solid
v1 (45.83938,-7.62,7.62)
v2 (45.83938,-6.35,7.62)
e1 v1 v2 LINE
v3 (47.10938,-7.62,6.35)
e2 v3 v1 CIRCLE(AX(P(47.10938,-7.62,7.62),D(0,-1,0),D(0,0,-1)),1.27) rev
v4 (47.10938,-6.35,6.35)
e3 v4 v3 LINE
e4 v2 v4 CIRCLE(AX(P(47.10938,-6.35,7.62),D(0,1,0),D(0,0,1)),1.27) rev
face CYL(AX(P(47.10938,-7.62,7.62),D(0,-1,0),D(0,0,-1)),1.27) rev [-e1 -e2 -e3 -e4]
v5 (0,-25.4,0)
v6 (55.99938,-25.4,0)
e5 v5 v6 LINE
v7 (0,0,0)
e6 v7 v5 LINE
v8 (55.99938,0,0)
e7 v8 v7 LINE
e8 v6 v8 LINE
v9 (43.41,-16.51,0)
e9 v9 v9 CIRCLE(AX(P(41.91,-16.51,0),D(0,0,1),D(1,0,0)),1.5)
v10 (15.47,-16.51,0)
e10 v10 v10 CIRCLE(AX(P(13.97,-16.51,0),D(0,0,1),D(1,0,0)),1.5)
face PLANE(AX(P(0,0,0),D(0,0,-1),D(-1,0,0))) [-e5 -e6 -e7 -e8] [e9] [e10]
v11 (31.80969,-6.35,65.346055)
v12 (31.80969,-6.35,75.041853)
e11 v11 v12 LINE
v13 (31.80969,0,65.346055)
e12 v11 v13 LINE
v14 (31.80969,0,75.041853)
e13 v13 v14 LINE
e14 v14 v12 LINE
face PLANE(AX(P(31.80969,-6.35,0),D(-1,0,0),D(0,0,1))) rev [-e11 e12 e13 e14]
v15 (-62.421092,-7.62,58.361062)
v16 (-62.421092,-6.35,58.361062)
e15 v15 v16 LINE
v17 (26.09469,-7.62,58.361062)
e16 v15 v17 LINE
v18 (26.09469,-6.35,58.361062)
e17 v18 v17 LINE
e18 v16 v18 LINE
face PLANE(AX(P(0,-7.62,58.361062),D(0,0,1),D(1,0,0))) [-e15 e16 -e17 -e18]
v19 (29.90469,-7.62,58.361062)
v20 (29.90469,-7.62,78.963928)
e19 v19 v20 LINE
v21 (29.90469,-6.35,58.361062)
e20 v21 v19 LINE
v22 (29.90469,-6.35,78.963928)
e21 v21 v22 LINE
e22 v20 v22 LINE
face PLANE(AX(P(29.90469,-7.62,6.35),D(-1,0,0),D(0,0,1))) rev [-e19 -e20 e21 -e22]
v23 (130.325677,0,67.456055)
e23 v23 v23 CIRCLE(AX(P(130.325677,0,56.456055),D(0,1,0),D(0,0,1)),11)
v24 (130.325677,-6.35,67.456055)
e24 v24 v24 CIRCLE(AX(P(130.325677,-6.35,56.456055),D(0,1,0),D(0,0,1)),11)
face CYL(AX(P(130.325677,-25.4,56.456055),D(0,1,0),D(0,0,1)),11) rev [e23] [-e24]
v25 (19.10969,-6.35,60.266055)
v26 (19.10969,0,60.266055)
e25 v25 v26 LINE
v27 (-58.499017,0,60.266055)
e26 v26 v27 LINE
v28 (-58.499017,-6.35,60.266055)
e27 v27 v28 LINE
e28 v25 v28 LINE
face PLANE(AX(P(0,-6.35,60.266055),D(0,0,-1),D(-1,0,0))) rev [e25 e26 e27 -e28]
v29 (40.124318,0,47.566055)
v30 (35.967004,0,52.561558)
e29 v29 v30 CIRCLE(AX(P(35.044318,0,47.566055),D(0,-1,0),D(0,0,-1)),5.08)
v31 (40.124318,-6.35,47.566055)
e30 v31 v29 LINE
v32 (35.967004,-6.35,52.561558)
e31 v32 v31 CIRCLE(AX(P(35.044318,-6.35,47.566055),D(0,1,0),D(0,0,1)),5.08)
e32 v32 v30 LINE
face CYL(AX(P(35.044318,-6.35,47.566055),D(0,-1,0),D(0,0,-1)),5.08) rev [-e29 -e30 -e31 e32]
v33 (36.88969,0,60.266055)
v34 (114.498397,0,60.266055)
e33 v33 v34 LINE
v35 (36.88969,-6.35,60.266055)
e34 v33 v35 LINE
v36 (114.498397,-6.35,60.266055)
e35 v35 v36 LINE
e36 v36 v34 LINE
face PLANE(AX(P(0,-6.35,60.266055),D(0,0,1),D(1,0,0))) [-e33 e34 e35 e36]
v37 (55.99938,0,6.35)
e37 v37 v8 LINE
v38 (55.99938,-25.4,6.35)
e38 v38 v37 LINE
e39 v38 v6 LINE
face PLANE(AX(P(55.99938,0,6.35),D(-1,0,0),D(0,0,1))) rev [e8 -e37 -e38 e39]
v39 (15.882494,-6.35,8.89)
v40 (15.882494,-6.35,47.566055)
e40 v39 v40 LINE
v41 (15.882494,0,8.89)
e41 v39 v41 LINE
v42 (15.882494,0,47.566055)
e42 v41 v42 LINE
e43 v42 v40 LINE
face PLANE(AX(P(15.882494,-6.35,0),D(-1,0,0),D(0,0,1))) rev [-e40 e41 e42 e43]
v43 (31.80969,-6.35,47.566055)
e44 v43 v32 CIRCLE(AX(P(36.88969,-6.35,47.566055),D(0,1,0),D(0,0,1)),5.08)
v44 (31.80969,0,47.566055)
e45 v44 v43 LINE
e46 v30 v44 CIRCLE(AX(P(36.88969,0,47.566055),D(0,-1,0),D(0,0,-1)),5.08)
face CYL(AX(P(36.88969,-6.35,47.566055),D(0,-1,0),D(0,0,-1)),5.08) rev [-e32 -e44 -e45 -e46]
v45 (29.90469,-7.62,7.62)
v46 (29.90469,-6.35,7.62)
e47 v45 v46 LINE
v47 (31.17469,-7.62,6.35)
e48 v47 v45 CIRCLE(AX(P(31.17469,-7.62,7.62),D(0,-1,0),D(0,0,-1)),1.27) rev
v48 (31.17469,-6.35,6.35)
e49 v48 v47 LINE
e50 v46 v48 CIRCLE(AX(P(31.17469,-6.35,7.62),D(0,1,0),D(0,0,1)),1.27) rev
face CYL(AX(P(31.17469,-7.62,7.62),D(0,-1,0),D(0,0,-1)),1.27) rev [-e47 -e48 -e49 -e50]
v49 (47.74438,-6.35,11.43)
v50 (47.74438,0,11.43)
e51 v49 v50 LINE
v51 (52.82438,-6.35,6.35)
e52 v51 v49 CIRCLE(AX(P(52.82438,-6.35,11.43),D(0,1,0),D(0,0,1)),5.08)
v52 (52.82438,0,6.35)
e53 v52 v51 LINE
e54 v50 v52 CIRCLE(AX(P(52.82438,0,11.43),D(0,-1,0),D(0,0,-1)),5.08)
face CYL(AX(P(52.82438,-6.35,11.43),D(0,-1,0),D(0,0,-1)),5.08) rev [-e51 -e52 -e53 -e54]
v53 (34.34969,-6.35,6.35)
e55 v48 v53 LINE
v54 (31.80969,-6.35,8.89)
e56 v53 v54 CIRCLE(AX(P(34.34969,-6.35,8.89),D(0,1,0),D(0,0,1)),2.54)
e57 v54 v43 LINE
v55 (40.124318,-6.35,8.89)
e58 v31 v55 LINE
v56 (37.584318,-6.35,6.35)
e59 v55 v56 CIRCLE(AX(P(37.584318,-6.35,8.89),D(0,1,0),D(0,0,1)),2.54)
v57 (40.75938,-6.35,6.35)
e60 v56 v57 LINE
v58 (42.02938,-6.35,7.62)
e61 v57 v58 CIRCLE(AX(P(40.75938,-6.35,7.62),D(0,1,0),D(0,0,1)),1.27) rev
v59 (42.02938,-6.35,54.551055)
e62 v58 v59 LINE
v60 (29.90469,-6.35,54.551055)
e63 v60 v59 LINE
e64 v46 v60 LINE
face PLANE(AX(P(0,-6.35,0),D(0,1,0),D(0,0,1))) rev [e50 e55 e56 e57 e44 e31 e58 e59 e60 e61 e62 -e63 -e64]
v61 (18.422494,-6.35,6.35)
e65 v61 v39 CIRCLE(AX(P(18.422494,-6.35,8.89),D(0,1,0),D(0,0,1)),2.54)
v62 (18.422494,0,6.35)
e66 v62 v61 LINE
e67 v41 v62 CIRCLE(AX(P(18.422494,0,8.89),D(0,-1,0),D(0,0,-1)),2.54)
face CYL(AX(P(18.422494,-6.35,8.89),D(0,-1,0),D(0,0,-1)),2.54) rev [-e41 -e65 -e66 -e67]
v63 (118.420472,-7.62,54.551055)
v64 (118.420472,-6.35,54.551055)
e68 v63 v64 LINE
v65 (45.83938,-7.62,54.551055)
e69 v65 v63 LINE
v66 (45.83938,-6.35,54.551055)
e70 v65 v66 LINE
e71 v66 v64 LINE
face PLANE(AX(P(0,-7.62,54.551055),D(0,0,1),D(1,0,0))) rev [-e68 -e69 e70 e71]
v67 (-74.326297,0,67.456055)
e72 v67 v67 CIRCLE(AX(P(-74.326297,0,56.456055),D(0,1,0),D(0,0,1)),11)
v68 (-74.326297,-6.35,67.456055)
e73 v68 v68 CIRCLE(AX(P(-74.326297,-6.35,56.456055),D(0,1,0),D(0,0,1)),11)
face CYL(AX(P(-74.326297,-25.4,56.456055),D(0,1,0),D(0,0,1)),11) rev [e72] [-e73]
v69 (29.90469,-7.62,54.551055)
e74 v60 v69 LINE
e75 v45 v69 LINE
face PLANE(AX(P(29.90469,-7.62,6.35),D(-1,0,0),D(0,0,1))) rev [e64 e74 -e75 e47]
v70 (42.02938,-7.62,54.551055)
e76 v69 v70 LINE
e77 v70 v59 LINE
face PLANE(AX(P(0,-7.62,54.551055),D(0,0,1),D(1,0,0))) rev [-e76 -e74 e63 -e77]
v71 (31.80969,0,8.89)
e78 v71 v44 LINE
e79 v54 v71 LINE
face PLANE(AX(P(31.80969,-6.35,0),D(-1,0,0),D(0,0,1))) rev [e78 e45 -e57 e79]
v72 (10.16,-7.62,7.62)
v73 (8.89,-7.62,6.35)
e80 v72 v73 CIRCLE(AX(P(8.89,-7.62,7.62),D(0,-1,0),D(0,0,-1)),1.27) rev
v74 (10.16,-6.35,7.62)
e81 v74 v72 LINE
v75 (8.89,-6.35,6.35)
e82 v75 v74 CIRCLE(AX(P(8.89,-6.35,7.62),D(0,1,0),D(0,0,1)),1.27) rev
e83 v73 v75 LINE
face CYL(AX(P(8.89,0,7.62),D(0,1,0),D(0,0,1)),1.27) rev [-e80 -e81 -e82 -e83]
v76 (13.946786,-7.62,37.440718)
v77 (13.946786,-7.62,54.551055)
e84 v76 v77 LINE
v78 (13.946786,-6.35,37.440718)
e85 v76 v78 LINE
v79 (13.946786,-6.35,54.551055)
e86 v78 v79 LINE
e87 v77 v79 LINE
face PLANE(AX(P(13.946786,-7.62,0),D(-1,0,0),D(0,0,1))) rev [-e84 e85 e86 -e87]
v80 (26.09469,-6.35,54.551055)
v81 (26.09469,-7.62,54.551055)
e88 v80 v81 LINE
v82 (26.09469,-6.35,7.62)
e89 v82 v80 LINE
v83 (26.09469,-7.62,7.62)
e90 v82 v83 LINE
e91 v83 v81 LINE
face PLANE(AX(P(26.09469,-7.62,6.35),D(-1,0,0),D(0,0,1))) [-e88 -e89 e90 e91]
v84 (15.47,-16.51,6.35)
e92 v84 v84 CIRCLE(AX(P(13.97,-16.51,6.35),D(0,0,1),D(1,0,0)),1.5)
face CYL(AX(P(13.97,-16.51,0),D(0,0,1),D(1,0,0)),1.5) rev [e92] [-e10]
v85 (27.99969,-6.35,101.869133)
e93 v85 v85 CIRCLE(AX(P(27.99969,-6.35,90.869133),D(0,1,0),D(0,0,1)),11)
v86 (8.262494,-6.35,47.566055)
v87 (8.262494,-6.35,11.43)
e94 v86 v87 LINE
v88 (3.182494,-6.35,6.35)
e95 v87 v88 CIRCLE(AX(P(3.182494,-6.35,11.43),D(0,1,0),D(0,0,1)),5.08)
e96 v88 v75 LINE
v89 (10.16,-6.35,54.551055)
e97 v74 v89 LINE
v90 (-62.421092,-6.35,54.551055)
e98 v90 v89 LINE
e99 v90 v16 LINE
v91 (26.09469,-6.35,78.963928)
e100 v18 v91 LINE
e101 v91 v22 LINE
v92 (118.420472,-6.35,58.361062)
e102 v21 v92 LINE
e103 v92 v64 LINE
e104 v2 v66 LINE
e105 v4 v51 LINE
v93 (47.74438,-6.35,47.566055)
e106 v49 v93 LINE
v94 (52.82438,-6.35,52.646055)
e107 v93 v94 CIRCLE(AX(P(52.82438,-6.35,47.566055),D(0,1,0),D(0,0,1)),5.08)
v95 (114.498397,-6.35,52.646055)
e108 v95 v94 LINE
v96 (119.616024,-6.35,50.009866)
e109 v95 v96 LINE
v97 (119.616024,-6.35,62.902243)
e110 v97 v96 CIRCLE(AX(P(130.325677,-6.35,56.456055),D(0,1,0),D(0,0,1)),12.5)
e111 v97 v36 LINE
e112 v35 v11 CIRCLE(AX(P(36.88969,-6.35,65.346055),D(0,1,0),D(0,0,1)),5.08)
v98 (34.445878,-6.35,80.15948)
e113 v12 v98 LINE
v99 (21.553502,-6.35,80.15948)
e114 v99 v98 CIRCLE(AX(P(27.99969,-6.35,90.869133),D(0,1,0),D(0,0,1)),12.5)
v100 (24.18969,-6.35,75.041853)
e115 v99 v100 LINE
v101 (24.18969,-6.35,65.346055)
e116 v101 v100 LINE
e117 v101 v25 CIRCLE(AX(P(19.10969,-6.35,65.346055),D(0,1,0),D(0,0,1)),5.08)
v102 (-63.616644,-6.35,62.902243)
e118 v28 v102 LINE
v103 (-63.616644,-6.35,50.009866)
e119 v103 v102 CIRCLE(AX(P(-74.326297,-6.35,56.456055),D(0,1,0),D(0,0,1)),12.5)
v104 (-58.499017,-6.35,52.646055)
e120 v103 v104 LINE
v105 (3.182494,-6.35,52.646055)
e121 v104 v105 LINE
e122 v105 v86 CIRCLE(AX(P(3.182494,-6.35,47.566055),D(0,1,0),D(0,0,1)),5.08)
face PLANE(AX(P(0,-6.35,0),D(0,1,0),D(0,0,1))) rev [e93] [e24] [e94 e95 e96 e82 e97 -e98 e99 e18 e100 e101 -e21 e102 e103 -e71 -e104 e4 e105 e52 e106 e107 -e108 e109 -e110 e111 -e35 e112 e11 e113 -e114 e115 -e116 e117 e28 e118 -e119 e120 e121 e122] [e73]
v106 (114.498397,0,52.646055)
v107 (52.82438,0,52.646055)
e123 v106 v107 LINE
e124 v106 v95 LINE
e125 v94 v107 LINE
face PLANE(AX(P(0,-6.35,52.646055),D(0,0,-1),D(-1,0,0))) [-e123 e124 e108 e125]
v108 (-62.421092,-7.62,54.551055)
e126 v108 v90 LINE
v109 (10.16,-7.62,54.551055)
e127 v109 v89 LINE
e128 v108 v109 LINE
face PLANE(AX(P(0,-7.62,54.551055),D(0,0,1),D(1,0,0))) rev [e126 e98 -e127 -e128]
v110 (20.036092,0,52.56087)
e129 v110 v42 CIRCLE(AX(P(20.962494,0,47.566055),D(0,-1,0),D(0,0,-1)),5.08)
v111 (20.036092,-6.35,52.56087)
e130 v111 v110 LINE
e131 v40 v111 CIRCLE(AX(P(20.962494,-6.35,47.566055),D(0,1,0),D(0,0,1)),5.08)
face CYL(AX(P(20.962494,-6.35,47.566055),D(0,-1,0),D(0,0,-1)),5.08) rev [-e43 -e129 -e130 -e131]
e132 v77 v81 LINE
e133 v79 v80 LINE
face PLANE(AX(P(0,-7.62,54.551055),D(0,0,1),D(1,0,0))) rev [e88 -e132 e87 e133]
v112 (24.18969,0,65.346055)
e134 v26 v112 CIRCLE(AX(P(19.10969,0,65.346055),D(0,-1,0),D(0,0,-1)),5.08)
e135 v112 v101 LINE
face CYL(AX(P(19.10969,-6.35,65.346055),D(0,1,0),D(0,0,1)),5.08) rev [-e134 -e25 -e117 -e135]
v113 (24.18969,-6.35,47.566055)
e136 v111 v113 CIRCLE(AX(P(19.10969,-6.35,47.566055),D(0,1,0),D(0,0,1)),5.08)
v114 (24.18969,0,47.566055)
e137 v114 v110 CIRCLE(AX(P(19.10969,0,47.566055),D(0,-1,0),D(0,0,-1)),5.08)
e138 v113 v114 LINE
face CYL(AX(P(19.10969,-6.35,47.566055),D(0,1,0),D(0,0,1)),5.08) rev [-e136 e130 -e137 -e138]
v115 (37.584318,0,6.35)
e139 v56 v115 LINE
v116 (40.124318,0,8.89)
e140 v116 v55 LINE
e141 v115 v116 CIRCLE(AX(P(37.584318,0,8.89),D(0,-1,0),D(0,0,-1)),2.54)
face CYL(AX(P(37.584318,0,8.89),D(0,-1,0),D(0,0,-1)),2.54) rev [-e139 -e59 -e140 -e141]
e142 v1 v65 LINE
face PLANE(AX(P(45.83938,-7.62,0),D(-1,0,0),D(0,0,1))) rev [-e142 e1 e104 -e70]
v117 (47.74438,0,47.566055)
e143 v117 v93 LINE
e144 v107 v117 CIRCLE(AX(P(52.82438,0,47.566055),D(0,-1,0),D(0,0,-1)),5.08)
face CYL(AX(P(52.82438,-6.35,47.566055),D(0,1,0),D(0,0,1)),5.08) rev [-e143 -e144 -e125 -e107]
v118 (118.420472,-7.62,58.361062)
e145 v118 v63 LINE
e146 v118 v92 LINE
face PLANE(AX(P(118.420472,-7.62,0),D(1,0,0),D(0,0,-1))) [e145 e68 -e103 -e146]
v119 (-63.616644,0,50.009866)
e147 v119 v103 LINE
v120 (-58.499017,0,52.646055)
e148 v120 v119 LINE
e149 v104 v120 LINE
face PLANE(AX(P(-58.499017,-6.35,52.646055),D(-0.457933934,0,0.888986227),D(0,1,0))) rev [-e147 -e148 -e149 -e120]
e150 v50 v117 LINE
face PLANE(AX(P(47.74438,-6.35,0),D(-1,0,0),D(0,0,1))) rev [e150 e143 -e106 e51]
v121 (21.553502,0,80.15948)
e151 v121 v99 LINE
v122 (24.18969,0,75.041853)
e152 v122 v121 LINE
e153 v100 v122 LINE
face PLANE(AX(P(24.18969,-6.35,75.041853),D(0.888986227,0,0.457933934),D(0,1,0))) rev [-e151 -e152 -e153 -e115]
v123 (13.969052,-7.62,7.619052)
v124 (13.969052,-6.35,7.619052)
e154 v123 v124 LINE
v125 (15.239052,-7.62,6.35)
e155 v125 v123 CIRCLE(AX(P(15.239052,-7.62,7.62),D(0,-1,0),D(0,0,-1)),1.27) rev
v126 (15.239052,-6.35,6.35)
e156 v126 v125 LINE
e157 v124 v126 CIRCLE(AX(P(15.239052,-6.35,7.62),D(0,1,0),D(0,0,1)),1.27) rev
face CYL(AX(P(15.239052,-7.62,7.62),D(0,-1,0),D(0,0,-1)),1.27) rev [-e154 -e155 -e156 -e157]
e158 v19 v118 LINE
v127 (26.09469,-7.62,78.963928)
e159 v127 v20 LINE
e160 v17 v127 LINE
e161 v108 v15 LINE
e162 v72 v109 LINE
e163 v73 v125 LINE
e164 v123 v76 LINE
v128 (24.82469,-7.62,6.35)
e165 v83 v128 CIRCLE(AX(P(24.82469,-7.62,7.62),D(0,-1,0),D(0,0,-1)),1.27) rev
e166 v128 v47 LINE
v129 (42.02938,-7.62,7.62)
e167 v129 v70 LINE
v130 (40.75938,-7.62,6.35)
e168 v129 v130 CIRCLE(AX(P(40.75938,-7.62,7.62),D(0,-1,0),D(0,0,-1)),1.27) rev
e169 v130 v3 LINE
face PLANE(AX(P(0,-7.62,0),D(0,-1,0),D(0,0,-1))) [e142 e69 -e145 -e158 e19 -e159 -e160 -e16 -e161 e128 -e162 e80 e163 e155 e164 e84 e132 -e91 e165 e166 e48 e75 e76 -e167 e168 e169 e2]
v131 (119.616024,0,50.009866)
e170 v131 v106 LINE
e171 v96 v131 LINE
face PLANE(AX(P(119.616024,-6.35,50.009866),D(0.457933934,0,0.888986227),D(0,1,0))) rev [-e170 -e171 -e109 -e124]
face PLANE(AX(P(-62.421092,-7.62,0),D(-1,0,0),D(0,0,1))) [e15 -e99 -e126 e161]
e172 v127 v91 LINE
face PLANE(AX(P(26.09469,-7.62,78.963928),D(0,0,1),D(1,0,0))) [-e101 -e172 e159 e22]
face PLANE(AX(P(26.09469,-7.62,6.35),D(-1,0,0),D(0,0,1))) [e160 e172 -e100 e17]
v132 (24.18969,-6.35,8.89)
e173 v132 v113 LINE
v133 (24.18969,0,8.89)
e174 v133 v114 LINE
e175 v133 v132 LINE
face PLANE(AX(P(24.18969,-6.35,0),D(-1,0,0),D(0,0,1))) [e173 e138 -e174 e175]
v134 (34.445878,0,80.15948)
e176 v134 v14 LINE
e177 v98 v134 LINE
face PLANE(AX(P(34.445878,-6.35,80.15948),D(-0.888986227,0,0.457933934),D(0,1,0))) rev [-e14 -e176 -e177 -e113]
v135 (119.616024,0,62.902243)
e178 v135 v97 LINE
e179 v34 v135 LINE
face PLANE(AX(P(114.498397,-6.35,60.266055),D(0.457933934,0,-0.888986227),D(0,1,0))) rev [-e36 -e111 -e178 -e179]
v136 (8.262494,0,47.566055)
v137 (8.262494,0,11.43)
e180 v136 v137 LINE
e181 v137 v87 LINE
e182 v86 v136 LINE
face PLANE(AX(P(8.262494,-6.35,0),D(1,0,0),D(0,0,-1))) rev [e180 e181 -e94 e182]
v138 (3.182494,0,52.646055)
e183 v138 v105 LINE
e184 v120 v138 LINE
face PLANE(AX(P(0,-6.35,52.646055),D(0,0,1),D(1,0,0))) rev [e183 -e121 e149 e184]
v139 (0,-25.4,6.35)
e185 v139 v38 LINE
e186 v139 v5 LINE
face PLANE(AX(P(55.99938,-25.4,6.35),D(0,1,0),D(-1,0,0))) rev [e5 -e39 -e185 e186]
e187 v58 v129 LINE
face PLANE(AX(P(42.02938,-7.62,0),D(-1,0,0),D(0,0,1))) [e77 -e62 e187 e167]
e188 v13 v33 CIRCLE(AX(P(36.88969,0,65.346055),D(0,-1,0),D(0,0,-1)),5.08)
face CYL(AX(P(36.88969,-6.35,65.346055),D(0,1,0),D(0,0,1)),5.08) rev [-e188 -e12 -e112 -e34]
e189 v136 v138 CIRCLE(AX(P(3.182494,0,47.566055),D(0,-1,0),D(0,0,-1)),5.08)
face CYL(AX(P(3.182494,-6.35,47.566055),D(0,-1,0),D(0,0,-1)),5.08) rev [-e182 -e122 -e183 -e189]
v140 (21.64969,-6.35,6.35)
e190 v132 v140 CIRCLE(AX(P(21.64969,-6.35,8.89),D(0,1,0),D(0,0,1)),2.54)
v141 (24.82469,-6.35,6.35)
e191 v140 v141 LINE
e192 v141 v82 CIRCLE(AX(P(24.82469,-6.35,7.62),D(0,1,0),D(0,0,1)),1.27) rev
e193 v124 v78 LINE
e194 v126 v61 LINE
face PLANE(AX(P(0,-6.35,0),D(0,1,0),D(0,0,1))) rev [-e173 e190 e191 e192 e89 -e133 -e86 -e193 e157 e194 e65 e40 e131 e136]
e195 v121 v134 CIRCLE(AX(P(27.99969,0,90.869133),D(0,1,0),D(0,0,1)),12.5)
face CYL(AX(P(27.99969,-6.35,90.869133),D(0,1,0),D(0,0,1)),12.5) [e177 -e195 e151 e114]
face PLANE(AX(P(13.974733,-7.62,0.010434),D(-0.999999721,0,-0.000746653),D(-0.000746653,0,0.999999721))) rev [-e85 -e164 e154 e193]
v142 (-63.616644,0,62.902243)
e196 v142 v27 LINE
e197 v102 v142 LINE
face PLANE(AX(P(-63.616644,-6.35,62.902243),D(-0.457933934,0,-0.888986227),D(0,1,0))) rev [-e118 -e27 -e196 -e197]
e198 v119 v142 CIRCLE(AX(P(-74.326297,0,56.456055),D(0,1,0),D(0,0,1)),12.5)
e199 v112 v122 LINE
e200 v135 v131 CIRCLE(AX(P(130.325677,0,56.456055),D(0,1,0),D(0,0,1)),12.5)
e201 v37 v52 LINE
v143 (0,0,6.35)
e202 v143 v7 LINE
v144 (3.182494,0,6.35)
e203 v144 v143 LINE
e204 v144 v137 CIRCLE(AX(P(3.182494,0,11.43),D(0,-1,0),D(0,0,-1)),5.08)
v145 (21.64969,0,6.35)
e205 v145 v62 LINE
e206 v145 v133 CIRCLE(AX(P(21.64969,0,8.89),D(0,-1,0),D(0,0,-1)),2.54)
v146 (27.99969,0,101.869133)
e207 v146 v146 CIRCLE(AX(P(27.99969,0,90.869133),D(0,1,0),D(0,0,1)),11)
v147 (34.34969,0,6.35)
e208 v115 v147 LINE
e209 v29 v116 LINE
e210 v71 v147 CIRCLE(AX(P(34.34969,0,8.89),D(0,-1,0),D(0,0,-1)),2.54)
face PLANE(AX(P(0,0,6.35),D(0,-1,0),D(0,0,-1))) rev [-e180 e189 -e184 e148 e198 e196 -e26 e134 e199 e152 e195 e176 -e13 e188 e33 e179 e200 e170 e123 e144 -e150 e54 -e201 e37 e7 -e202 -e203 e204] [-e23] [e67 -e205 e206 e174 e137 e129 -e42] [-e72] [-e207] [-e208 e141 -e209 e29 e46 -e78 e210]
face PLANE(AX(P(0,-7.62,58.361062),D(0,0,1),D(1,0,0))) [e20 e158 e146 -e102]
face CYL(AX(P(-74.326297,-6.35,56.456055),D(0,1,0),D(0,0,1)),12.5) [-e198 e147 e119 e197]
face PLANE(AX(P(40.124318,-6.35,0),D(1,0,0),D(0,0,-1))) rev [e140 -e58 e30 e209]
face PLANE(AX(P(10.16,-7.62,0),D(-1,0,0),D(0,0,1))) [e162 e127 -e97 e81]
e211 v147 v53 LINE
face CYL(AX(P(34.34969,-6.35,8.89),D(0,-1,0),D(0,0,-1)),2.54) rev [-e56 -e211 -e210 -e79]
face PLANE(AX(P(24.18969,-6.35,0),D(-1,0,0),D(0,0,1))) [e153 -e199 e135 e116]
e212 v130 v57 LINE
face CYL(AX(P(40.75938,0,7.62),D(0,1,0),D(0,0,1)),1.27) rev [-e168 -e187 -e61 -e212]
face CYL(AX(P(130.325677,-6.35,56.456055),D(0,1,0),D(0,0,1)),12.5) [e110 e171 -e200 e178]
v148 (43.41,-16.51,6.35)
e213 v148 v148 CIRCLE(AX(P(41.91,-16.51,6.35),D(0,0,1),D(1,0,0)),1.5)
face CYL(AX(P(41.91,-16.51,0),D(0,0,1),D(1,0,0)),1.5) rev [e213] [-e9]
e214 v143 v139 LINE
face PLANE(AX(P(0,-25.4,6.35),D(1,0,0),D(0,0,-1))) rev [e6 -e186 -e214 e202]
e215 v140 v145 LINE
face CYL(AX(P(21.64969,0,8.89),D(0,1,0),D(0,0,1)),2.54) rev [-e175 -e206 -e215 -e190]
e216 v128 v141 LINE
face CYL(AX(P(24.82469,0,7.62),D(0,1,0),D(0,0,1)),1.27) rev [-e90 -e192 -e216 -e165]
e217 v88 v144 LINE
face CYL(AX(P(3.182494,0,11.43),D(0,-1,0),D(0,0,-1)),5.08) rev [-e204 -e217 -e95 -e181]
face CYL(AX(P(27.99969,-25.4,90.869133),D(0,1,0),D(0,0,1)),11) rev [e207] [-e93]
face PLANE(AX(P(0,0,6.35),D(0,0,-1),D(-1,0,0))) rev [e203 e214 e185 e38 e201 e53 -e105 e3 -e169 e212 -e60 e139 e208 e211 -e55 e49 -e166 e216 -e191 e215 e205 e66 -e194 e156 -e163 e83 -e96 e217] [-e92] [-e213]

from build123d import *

# Parameters (mm, degrees)
SKETCH1_W           = 55.99938
SKETCH1_H           = 25.4
BOSS_EXTRUDE1_DEPTH = 6.35
BOSS_EXTRUDE2_DEPTH = 6.35
SKETCH10_R          = 10.999999971
CUT_EXTRUDE3_DEPTH  = 179.12779542
FILLET1_R           = 5.08
FILLET2_R           = 5.08
FILLET3_R           = 5.08
FILLET4_R           = 5.08
FILLET5_R           = 5.08
FILLET6_R           = 5.08
FILLET7_R           = 2.54
SKETCH9_R           = 1.5
CUT_EXTRUDE2_DEPTH  = 175.519471736
BOSS_EXTRUDE3_DEPTH = 1.27
FILLET8_R           = 1.27
CHAMFER1_SIZE       = 3.922074982
CHAMFER3_SIZE       = 3.922074982
CHAMFER4_SIZE       = 3.922074982


with BuildPart() as part:
    # Sketch1 → Boss-Extrude1 (new body)
    with BuildSketch(Plane.XY):
        with Locations((27.99969, -12.7)):
            Rectangle(SKETCH1_W, SKETCH1_H)
    extrude(amount=BOSS_EXTRUDE1_DEPTH)

    # Sketch2 → Boss-Extrude2 (add)
    with BuildSketch(Plane(origin=(0, 0, 0), x_dir=(1, 0, 0), z_dir=(0, 1, 0))):
        with BuildLine():
            ThreePointArc((118.420471835, -60.26605485), (142.825676579, -56.45605485), (118.420471835, -52.64605485))
            Line((118.420471835, -52.64605485), (47.74438, -52.64605485))
            Line((47.74438, -52.64605485), (47.74438, -6.35))
            Line((47.74438, -6.35), (40.124318317, -6.35))
            Line((40.124318317, -6.35), (40.124318317, -52.64605485))
            Line((40.124318317, -52.64605485), (31.80969, -52.64605485))
            Line((31.80969, -52.64605485), (31.80969, -6.35))
            Line((31.80969, -6.35), (24.18969, -6.35))
            Line((24.18969, -6.35), (24.18969, -52.64605485))
            Line((24.18969, -52.64605485), (15.882493554, -52.64605485))
            Line((15.882493554, -52.64605485), (15.882493554, -6.35))
            Line((15.882493554, -6.35), (8.262493554, -6.35))
            Line((8.262493554, -6.35), (8.262493554, -52.64605485))
            Line((8.262493554, -52.64605485), (-62.421091835, -52.64605485))
            ThreePointArc((-62.421091835, -52.64605485), (-86.826296579, -56.45605485), (-62.421091835, -60.26605485))
            Line((-62.421091835, -60.26605485), (24.18969, -60.26605485))
            Line((24.18969, -60.26605485), (24.18969, -78.963928031))
            ThreePointArc((24.18969, -78.963928031), (27.99969, -103.369132775), (31.80969, -78.963928031))
            Line((31.80969, -78.963928031), (31.80969, -60.26605485))
            Line((31.80969, -60.26605485), (118.420471835, -60.26605485))
        make_face()
    extrude(amount=-BOSS_EXTRUDE2_DEPTH)

    # Sketch10 → Cut-Extrude3 (cut, through all)
    with BuildSketch(Plane(origin=(0, 0, 0), x_dir=(1, 0, 0), z_dir=(0, 1, 0))):
        with Locations(Location((-74.326296579, -56.45605485, 0), (0, 0, 270))):
            Circle(SKETCH10_R)
        with Locations(Location((27.99969, -90.869132775, 0), (0, 0, 270))):
            Circle(SKETCH10_R)
        with Locations(Location((130.325676579, -56.45605485, 0), (0, 0, 270))):
            Circle(SKETCH10_R)
    extrude(amount=-CUT_EXTRUDE3_DEPTH, mode=Mode.SUBTRACT)

    # Fillet1
    fillet1_edges = [part.edges().sort_by_distance(p)[0] for p in [
        (8.262493554, -3.175, 6.35),
    ]]
    fillet(fillet1_edges, radius=FILLET1_R)

    # Fillet2
    fillet2_edges = [part.edges().sort_by_distance(p)[0] for p in [
        (47.74438, -3.175, 6.35),
    ]]
    fillet(fillet2_edges, radius=FILLET2_R)

    # Fillet3
    fillet3_edges = [part.edges().sort_by_distance(p)[0] for p in [
        (47.74438, -3.175, 52.64605485),
    ]]
    fillet(fillet3_edges, radius=FILLET3_R)

    # Fillet4
    fillet4_edges = [part.edges().sort_by_distance(p)[0] for p in [
        (8.262493554, -3.175, 52.64605485),
    ]]
    fillet(fillet4_edges, radius=FILLET4_R)

    # Fillet5
    fillet5_edges = [part.edges().sort_by_distance(p)[0] for p in [
        (31.80969, -3.175, 60.26605485),
        (24.18969, -3.175, 60.26605485),
    ]]
    fillet(fillet5_edges, radius=FILLET5_R)

    # Fillet6
    # the kernel refuses this fillet: 5.08 mm, written as the material it adds along each edge
    with BuildSketch(Plane(origin=(40.124318317, 0, 52.64605485), x_dir=(0, 0, -1), z_dir=(0, -1, 0)), Plane(origin=(24.18969, 0, 52.64605485), x_dir=(0, 0, -1), z_dir=(0, -1, 0))) as fillet6_piece_1:
        with BuildLine():
            CenterArc((FILLET6_R, -FILLET6_R), FILLET6_R, 90, 90)
            Line((0, -FILLET6_R), (0, 0))
            Line((0, 0), (FILLET6_R, 0))
        make_face()
    extrude(amount=6.35)
    with BuildSketch(Plane(origin=(31.80969, 0, 52.64605485), x_dir=(0, 0, -1), z_dir=(0, -1, 0)), Plane(origin=(15.882493554, 0, 52.64605485), x_dir=(0, 0, -1), z_dir=(0, -1, 0))) as fillet6_piece_2:
        with BuildLine():
            CenterArc((FILLET6_R, FILLET6_R), FILLET6_R, 180, 90)
            Line((0, FILLET6_R), (0, 0))
            Line((0, 0), (FILLET6_R, 0))
        make_face()
    extrude(amount=6.35)

    # Fillet7
    fillet7_edges = [part.edges().sort_by_distance(p)[0] for p in [
        (15.882493554, -3.175, 6.35),
        (24.18969, -3.175, 6.35),
        (31.80969, -3.175, 6.35),
        (40.124318317, -3.175, 6.35),
    ]]
    fillet(fillet7_edges, radius=FILLET7_R)

    # Sketch9 → Cut-Extrude2 (cut, through all)
    with BuildSketch(Plane.XY.offset(6.35)):
        with Locations((13.97, -16.51)):
            Circle(SKETCH9_R)
        with Locations((41.91, -16.51)):
            Circle(SKETCH9_R)
    extrude(amount=-CUT_EXTRUDE2_DEPTH, mode=Mode.SUBTRACT)

    # Sketch13 → Boss-Extrude3 (add)
    with BuildSketch(Plane.XZ.offset(6.35)):
        Polygon((-62.421091835, 58.361061908), (-62.421091835, 54.55105485), (10.160000409, 54.55105485), (10.160000409, 6.35), (13.97, 6.35), (13.946786012, 37.440717912), (13.946786012, 54.55105485), (26.09469, 54.55105485), (26.09469, 6.35), (29.90469, 6.35), (29.90469, 54.55105485), (42.02938, 54.55105485), (42.02938, 6.35), (45.83938, 6.35), (45.83938, 54.55105485), (118.420471835, 54.55105485), (118.420471835, 58.361061908), (29.90469, 58.361061908), (29.90469, 78.963928031), (26.09469, 78.963928031), (26.09469, 58.361061908), align=None)
    extrude(amount=BOSS_EXTRUDE3_DEPTH)

    # Fillet8
    fillet8_edges = [part.edges().sort_by_distance(p)[0] for p in [
        (10.160000409, -6.985, 6.35),
        (13.97, -6.985, 6.35),
        (42.02938, -6.985, 6.35),
        (45.83938, -6.985, 6.35),
        (26.09469, -6.985, 6.35),
        (29.90469, -6.985, 6.35),
    ]]
    fillet(fillet8_edges, radius=FILLET8_R)

    # Chamfer1
    # the kernel refuses this chamfer: 3.922074982, 2.54 mm, written as the material it adds along each edge
    with BuildSketch(Plane(origin=(-62.421091835, 0, 52.64605485), x_dir=(1, 0, 0), z_dir=(0, -1, 0))) as chamfer1_piece_1:
        with BuildLine():
            Line((CHAMFER1_SIZE, 0), (-1.195552336, -2.636188431))
            ThreePointArc((-1.195552336, -2.636188431), (-0.547031751, -1.409377958), (0, 0))
            Line((0, 0), (CHAMFER1_SIZE, 0))
        make_face()
    extrude(amount=6.35)
    with BuildSketch(Plane(origin=(-62.421091835, 0, 60.26605485), x_dir=(-0.4130254162108394, 0, 0.9107194988380687), z_dir=(0, -1, 0))) as chamfer1_piece_2:
        with BuildLine():
            Line((2.894621708, 0), (-CHAMFER1_SIZE * 0.413025416196, -CHAMFER1_SIZE * 0.910719498804))
            Line((-CHAMFER1_SIZE * 0.413025416196, -CHAMFER1_SIZE * 0.910719498804), (0, 0))
            ThreePointArc((0, 0), (1.509486004, -0.083916435), (2.894621708, 0))
        make_face()
    extrude(amount=6.35)

    # Chamfer3
    # the kernel refuses this chamfer: 3.922074982, 2.54 mm, written as the material it adds along each edge
    with BuildSketch(Plane(origin=(118.420471835, 0, 52.64605485), x_dir=(0.4130254162108416, 0, -0.9107194988380676), z_dir=(0, -1, 0))) as chamfer3_piece_1:
        with BuildLine():
            Line((2.894621708, 0), (-CHAMFER3_SIZE * 0.413025416196, -CHAMFER3_SIZE * 0.910719498804))
            Line((-CHAMFER3_SIZE * 0.413025416196, -CHAMFER3_SIZE * 0.910719498804), (0, 0))
            ThreePointArc((0, 0), (1.509486004, -0.083916435), (2.894621708, 0))
        make_face()
    extrude(amount=6.35)
    with BuildSketch(Plane(origin=(118.420471835, 0, 60.26605485), x_dir=(-1, 0, 0), z_dir=(0, -1, 0))) as chamfer3_piece_2:
        with BuildLine():
            Line((CHAMFER3_SIZE, 0), (-1.195552336, -2.636188431))
            ThreePointArc((-1.195552336, -2.636188431), (-0.547031751, -1.409377958), (0, 0))
            Line((0, 0), (CHAMFER3_SIZE, 0))
        make_face()
    extrude(amount=6.35)

    # Chamfer4
    # the kernel refuses this chamfer: 3.922074982, 2.54 mm, written as the material it adds along each edge
    with BuildSketch(Plane(origin=(31.80969, 0, 78.963928031), x_dir=(0.9107194988380676, 0, 0.4130254162108416), z_dir=(0, -1, 0))) as chamfer4_piece_1:
        with BuildLine():
            Line((2.894621708, 0), (-CHAMFER4_SIZE * 0.413025416196, -CHAMFER4_SIZE * 0.910719498804))
            Line((-CHAMFER4_SIZE * 0.413025416196, -CHAMFER4_SIZE * 0.910719498804), (0, 0))
            ThreePointArc((0, 0), (1.509486004, -0.083916435), (2.894621708, 0))
        make_face()
    extrude(amount=6.35)
    with BuildSketch(Plane(origin=(24.18969, 0, 78.963928031), x_dir=(0, 0, -1), z_dir=(0, -1, 0))) as chamfer4_piece_2:
        with BuildLine():
            Line((CHAMFER4_SIZE, 0), (-1.195552336, -2.636188431))
            ThreePointArc((-1.195552336, -2.636188431), (-0.547031751, -1.409377958), (0, 0))
            Line((0, 0), (CHAMFER4_SIZE, 0))
        make_face()
    extrude(amount=6.35)


solid = part.part
